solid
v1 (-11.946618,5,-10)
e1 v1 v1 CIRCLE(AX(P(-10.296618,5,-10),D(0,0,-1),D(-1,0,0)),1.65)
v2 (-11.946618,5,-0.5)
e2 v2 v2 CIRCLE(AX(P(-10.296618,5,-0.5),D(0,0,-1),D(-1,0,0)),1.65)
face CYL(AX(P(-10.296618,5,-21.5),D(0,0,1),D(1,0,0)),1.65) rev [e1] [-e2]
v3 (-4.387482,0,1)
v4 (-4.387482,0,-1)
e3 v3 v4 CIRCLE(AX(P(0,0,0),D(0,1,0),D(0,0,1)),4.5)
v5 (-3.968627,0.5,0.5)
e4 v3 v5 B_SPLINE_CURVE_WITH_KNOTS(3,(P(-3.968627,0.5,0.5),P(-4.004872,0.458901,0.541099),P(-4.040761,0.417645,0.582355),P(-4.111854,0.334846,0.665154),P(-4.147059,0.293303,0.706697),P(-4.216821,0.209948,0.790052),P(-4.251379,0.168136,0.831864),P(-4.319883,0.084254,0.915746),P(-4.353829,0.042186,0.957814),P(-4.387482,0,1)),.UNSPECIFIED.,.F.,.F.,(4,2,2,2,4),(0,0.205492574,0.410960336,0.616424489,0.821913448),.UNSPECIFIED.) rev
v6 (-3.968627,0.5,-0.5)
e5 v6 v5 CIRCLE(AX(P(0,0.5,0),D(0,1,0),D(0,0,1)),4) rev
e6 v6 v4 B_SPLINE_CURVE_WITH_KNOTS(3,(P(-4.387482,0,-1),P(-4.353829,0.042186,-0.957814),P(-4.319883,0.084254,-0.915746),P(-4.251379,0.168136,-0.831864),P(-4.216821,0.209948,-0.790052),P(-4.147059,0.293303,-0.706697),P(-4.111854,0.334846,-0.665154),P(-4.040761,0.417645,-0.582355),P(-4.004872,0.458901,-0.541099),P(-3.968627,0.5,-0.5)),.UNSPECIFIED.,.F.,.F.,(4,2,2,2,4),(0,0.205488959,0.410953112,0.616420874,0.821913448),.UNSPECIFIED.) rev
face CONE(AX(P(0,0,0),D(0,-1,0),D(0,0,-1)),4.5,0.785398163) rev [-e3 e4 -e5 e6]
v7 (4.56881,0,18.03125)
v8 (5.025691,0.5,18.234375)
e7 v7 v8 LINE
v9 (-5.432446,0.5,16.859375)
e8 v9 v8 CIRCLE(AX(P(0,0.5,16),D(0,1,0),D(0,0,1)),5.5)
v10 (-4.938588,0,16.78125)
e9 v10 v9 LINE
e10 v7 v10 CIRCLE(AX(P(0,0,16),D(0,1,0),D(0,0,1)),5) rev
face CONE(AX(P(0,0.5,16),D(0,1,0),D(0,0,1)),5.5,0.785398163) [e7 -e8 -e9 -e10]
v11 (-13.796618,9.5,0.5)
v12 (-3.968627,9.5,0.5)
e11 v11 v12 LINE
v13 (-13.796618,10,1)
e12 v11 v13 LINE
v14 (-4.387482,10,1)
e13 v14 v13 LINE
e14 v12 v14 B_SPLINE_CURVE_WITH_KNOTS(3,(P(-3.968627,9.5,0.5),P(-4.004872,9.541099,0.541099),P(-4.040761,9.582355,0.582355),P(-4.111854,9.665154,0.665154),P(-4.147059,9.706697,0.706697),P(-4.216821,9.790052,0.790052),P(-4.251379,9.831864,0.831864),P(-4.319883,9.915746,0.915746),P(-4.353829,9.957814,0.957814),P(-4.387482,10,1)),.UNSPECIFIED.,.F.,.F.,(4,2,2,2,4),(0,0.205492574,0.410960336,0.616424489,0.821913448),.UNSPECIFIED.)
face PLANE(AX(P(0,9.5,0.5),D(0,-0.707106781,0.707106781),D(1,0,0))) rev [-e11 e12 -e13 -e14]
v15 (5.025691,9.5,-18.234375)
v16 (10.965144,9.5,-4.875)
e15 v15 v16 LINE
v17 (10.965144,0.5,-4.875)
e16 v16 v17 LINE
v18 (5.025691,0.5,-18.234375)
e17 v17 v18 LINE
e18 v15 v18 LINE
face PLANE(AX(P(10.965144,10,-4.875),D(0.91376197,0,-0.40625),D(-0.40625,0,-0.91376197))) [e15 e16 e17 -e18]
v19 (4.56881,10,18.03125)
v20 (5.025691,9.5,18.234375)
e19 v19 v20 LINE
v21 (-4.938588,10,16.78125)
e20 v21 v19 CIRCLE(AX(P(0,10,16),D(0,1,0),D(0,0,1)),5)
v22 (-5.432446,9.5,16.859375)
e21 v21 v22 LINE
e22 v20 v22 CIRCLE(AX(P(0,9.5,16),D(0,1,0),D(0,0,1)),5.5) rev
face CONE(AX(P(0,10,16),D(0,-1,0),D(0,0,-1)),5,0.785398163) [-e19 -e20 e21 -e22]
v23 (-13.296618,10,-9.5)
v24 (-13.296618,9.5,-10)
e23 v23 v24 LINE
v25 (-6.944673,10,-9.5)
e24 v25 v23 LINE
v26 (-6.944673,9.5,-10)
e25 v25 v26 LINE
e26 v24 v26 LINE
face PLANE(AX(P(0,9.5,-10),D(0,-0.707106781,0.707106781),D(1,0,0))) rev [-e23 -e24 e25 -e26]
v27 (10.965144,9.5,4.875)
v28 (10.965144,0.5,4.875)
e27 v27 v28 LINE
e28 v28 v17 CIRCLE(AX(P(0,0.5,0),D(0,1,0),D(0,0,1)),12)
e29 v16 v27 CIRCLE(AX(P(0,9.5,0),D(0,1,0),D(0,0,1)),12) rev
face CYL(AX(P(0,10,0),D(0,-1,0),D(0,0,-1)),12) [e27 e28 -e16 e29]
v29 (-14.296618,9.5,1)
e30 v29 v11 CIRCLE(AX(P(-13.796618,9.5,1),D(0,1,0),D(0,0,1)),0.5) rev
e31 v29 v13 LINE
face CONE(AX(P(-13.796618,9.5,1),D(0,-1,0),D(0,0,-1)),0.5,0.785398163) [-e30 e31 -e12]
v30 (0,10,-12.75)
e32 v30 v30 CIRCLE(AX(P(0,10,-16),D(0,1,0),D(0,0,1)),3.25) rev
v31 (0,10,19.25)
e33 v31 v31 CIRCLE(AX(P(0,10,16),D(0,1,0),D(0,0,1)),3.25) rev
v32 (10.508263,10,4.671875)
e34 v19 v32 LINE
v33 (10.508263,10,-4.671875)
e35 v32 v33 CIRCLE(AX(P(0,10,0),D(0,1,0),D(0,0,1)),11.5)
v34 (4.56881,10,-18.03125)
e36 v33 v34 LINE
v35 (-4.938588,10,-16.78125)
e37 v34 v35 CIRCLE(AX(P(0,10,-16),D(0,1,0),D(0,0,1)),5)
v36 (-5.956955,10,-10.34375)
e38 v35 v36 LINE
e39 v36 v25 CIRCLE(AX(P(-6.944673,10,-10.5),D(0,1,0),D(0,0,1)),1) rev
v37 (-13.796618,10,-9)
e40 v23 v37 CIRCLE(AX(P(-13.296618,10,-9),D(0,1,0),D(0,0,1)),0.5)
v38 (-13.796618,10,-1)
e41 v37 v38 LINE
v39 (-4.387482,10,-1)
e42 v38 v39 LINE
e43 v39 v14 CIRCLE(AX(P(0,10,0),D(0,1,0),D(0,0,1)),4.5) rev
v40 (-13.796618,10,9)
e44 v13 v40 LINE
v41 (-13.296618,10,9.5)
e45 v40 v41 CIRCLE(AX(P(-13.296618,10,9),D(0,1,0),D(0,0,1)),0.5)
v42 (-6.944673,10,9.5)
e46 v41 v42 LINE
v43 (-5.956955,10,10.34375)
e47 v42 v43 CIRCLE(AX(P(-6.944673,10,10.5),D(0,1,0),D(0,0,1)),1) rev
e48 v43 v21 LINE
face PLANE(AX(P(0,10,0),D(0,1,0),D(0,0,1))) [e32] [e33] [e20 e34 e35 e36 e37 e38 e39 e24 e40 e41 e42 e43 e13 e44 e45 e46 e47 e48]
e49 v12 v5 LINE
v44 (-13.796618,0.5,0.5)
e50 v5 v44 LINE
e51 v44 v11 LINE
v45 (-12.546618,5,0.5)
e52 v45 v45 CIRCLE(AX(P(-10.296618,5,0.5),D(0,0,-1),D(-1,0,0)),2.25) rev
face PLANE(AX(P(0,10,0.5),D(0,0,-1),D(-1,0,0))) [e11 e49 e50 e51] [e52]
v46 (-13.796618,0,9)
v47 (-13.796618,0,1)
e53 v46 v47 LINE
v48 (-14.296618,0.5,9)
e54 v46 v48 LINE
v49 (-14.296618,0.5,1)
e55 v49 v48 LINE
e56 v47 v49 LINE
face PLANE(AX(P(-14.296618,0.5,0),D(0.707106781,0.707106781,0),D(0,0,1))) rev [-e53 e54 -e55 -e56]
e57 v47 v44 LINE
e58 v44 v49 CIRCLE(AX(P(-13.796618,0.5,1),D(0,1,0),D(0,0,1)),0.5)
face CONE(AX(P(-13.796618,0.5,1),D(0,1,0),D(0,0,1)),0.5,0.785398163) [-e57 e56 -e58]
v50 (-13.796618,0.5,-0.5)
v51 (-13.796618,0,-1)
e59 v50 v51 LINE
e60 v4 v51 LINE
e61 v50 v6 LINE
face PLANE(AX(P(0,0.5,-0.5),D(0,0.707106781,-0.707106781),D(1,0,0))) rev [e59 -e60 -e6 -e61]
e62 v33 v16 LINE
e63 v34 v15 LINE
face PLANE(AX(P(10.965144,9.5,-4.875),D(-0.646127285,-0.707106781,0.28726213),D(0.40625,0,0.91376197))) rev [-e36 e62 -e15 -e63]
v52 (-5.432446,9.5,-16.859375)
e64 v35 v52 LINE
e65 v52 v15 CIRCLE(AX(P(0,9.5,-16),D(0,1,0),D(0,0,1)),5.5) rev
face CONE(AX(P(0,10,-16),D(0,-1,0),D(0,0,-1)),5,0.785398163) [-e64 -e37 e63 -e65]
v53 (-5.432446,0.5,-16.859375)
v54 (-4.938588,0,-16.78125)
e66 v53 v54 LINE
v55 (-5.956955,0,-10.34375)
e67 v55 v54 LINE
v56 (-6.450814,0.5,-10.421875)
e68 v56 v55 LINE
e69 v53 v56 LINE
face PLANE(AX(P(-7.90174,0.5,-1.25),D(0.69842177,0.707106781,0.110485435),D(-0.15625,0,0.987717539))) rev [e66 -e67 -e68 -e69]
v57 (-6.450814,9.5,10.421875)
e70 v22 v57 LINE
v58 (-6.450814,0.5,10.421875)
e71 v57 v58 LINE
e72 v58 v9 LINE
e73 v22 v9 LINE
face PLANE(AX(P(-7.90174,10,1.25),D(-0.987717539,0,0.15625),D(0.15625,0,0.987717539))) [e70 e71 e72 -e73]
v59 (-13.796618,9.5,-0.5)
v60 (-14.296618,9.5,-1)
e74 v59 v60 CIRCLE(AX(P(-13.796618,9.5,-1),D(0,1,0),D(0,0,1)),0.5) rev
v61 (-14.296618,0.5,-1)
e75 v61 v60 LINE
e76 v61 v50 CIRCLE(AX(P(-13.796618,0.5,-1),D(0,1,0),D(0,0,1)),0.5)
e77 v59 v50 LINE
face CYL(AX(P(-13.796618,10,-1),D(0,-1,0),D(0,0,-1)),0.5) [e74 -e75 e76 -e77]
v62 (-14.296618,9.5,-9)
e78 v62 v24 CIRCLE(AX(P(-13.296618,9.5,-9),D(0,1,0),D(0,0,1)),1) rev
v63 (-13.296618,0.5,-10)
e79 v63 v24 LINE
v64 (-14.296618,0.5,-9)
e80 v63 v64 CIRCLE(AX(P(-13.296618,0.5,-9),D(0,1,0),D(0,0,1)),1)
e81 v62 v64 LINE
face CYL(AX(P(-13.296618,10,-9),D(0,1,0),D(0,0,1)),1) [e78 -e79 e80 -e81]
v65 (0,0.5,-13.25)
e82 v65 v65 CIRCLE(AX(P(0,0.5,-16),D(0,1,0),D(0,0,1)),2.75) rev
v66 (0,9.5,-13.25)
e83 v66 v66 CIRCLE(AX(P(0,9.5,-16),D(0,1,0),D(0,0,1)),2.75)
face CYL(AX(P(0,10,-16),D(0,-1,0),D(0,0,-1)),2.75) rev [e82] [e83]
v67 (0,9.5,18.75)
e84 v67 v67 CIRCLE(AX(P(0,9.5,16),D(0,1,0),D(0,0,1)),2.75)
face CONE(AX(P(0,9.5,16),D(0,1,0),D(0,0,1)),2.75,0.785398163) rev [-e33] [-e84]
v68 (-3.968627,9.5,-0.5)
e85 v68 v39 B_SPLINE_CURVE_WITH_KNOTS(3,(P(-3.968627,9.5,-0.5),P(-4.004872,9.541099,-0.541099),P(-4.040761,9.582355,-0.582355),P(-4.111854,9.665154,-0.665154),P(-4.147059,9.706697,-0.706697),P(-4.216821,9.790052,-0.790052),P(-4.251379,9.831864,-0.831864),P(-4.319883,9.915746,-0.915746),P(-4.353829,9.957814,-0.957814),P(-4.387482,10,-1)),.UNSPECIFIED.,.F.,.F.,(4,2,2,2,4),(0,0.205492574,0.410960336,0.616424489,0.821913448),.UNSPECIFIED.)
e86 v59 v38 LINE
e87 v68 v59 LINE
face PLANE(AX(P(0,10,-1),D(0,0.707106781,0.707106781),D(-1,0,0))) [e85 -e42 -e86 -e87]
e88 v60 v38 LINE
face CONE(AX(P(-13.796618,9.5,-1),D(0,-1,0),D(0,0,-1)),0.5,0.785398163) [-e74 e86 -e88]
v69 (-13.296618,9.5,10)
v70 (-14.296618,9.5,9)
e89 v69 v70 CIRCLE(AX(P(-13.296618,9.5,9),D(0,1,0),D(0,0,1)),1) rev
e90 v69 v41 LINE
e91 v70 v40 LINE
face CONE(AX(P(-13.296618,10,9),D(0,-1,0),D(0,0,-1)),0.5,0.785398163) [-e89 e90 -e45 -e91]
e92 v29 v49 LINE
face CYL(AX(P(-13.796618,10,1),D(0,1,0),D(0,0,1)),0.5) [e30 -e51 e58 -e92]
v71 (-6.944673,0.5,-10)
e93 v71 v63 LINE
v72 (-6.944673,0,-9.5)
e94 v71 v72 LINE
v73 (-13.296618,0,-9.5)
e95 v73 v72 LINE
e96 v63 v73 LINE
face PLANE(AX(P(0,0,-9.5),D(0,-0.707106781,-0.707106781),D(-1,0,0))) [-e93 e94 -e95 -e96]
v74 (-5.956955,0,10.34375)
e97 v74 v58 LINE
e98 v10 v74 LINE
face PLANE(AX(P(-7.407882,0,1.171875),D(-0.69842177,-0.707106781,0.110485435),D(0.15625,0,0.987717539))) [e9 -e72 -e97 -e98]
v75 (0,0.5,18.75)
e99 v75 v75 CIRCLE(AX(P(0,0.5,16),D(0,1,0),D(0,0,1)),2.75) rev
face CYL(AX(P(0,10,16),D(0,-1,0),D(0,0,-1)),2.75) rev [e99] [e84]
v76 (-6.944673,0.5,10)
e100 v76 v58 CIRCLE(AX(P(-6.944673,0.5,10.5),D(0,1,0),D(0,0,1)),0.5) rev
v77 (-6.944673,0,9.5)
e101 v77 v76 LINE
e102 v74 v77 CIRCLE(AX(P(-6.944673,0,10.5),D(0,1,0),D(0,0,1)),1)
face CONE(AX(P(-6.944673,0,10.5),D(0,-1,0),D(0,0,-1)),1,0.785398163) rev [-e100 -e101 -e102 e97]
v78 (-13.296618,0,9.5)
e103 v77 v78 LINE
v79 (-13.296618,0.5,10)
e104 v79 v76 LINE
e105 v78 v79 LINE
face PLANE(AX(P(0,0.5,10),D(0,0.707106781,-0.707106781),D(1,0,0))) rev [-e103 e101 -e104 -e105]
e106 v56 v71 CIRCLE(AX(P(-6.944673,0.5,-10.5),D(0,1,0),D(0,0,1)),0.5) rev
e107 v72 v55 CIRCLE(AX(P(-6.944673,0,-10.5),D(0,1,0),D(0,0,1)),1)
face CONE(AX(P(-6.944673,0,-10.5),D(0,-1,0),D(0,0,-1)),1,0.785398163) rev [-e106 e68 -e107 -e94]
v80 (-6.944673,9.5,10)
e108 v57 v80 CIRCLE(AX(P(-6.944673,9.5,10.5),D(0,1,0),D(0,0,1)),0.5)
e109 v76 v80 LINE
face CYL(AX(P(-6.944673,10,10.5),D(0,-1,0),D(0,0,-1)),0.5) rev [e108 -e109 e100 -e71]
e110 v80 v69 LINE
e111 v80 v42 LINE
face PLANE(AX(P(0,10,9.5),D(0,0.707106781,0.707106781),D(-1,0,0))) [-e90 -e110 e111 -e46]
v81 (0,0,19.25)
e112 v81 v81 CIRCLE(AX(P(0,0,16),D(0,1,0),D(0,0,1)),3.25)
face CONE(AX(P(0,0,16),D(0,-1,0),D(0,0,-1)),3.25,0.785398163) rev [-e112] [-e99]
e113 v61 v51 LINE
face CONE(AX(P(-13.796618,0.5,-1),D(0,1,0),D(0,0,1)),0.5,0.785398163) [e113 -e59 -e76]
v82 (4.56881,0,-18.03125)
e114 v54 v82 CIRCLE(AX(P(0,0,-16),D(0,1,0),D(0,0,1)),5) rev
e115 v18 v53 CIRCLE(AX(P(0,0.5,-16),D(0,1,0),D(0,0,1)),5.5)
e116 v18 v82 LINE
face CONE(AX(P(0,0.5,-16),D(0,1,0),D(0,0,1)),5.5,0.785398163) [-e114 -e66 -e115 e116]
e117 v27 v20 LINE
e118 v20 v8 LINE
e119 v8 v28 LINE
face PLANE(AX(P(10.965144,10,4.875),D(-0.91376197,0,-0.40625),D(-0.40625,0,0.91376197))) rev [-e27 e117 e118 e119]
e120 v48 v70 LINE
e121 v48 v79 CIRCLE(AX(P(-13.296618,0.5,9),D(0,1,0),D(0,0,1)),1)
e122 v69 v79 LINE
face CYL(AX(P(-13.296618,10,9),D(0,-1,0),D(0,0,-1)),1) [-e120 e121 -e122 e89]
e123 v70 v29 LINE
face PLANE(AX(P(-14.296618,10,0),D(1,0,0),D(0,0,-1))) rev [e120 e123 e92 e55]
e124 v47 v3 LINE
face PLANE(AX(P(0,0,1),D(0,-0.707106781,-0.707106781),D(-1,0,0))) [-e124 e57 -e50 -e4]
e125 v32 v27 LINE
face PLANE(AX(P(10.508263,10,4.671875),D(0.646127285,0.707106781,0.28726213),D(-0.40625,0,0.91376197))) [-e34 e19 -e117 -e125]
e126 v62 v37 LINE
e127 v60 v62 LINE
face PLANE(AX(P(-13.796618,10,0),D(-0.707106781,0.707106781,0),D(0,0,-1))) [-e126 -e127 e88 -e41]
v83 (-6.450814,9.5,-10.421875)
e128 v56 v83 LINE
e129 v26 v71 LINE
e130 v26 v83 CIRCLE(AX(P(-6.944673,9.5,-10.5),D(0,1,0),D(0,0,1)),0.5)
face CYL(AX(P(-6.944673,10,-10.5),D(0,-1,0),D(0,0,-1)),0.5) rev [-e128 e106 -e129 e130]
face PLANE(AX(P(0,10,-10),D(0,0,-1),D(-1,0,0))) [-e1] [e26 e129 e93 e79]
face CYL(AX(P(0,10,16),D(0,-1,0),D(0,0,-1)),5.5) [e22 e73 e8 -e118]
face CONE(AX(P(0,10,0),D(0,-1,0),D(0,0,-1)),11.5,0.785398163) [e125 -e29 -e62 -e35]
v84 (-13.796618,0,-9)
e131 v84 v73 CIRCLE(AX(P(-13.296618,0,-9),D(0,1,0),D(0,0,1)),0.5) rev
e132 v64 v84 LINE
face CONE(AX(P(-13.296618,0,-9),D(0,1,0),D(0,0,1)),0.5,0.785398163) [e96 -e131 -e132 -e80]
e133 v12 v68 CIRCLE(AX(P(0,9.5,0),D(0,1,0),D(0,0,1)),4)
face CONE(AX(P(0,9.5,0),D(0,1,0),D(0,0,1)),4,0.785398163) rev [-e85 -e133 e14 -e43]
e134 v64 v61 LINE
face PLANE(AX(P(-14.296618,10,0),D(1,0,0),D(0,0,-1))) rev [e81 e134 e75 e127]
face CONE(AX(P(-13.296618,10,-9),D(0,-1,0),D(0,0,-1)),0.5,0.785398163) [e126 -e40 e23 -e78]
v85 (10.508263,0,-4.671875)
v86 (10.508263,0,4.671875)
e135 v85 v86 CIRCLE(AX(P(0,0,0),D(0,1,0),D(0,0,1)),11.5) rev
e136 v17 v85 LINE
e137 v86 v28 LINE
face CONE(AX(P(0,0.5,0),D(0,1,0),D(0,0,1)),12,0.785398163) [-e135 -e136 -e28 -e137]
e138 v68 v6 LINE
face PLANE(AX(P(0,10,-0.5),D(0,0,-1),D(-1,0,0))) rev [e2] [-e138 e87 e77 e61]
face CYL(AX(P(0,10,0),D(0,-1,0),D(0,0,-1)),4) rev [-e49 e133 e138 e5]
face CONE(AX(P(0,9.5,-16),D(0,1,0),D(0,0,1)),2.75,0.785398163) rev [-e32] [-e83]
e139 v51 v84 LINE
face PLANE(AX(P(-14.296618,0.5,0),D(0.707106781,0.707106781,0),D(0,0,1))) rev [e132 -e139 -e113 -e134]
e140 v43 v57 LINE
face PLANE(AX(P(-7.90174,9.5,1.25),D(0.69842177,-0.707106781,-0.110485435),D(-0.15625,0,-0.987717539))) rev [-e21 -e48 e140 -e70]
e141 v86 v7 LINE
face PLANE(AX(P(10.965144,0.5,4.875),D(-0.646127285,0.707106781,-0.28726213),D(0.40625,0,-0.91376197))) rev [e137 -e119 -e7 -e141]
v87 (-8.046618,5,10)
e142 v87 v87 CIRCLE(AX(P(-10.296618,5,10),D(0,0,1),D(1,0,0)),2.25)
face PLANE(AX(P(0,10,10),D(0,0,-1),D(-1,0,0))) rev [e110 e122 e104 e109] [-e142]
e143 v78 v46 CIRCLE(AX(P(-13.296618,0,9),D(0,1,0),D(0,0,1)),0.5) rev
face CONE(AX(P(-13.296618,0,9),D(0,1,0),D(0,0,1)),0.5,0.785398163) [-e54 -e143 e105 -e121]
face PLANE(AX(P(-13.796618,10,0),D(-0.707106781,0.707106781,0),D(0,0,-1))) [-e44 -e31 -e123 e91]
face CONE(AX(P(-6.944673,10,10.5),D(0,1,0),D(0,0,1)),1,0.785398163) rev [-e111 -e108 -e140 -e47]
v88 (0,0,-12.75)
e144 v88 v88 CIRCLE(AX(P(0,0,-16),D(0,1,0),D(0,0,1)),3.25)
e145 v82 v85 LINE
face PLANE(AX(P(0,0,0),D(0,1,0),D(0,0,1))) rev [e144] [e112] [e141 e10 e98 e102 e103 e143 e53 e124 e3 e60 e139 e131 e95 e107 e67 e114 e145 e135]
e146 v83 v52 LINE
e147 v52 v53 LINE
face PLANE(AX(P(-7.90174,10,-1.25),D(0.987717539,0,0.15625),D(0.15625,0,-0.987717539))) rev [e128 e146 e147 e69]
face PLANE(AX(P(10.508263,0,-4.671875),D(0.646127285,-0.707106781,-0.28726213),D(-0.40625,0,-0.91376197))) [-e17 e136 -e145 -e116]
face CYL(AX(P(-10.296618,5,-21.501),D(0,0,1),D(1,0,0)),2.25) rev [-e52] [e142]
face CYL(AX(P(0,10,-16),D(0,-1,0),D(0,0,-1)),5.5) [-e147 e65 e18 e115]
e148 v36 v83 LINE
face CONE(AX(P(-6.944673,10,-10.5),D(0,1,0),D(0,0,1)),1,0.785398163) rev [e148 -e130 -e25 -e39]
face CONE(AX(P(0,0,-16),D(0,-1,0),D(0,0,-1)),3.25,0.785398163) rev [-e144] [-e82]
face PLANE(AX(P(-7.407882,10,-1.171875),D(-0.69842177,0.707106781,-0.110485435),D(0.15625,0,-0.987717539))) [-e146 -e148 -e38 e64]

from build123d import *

# Parameters (mm, degrees)
SKETCH_1_R          = 2.75
EXTRUDE_1_DEPTH     = 10
CUT_EXTRUDE_1_REACH = 38.009
SKETCH_3_R          = 2.25
SKETCH_3_3_R        = 1.65
CUT_EXTRUDE_2_DEPTH = 37.00893353
FILLET_1_R          = 1
FILLET_2_R          = 0.5
CHAMFER_1_SIZE      = 0.5


with BuildPart() as part:
    # 草图1 → 凸台-拉伸1 (new body)
    with BuildSketch(Plane(origin=(0, 0, 0), x_dir=(1, 0, 0), z_dir=(0, 1, 0))):
        with BuildLine():
            ThreePointArc((5.025690834, 18.234375), (-0.716951035, 21.453070806), (-5.432446466, 16.859375))
            Line((-5.432446466, 16.859375), (-6.517551571, 10))
            Line((-6.517551571, 10), (-14.296618271, 10))
            Line((-14.296618271, 10), (-14.296618271, 0.5))
            Line((-14.296618271, 0.5), (-3.968626967, 0.5))
            ThreePointArc((-3.968626967, 0.5), (4, 0), (-3.968626967, -0.5))
            Line((-3.968626967, -0.5), (-14.296618271, -0.5))
            Line((-14.296618271, -0.5), (-14.296618271, -10))
            Line((-14.296618271, -10), (-6.517551571, -10))
            Line((-6.517551571, -10), (-5.432446466, -16.859375))
            ThreePointArc((-5.432446466, -16.859375), (-0.716951035, -21.453070806), (5.025690834, -18.234375))
            Line((5.025690834, -18.234375), (10.965143638, -4.875))
            ThreePointArc((10.965143638, -4.875), (12, 0), (10.965143638, 4.875))
            Line((10.965143638, 4.875), (5.025690834, 18.234375))
        make_face()
        with Locations(Location((0, -16, 0), (0, 0, 270))):
            Circle(SKETCH_1_R, mode=Mode.SUBTRACT)
        with Locations(Location((0, 16, 0), (0, 0, 270))):
            Circle(SKETCH_1_R, mode=Mode.SUBTRACT)
    extrude(amount=EXTRUDE_1_DEPTH)

    # 草图3 → 切除-拉伸1 (cut, up to next)
    with BuildSketch(Plane.XY.offset(10), mode=Mode.PRIVATE) as cut_extrude_1_sk1:
        with Locations((-10.296618271, 5)):
            Circle(SKETCH_3_R)
    cut_extrude_1_tool1 = extrude(cut_extrude_1_sk1.sketch, amount=-CUT_EXTRUDE_1_REACH, mode=Mode.PRIVATE) & part.part
    add(cut_extrude_1_tool1.solids().sort_by_distance((-10.296618, 5, 10))[0], mode=Mode.SUBTRACT)

    # 草图3<3> → 切除-拉伸2 (cut, through all)
    with BuildSketch(Plane.XY.offset(10)):
        with Locations(Location((-10.296618271, 5, 0), (0, 0, 180))):
            Circle(SKETCH_3_3_R)
    extrude(amount=-CUT_EXTRUDE_2_DEPTH, mode=Mode.SUBTRACT)

    # 圆角1
    fillet_1_edges = [part.edges().sort_by_distance(p)[0] for p in [
        (-14.296618271, 5, 10),
        (-14.296618271, 5, -10),
    ]]
    fillet(fillet_1_edges, radius=FILLET_1_R)

    # 圆角2
    fillet_2_edges = [part.edges().sort_by_distance(p)[0] for p in [
        (-6.517551571, 5, 10),
        (-14.296618271, 5, 0.5),
        (-14.296618271, 5, -0.5),
        (-6.517551571, 5, -10),
    ]]
    fillet(fillet_2_edges, radius=FILLET_2_R)

    # 倒角1
    chamfer_1_edges = [part.edges().sort_by_distance(p)[0] for p in [
        (-6.619913143, 0, 10.119827342),
        (-6.619913143, 10, 10.119827342),
        (-6.619913143, 0, -10.119827342),
        (-6.619913143, 10, -10.119827342),
        (-0.716951035, 10, 21.453070806),
        (7.995417236, 10, 11.5546875),
        (0, 0, 13.25),
        (0, 0, -18.75),
        (4, 0, 0),
        (12, 10, 0),
        (-5.941630183, 0, -13.640625),
        (-0.716951035, 0, -21.453070806),
        (7.995417236, 0, -11.5546875),
        (12, 0, 0),
        (7.995417236, 0, 11.5546875),
        (-0.716951035, 0, 21.453070806),
        (-5.941630183, 0, 13.640625),
        (7.995417236, 10, -11.5546875),
        (-0.716951035, 10, -21.453070806),
        (-5.941630183, 10, -13.640625),
        (4, 10, 0),
        (-14.296618271, 0, -5),
        (-14.296618271, 10, -5),
        (-10.12064547, 0, 10),
        (-10.12064547, 0, -10),
        (-14.003725052, 0, 9.707106781),
        (-14.003725052, 0, -9.707106781),
        (-10.12064547, 10, -10),
        (-5.941630183, 10, 13.640625),
        (-10.12064547, 10, 10),
        (-14.003725052, 10, 9.707106781),
        (-14.003725052, 10, -9.707106781),
        (0, 10, -18.75),
        (-8.882622619, 0, -0.5),
        (-8.882622619, 10, -0.5),
        (0, 10, 13.25),
        (-14.296618271, 0, 5),
        (-8.882622619, 0, 0.5),
        (-14.150171662, 0, 0.646446609),
        (-14.150171662, 0, -0.646446609),
        (-8.882622619, 10, 0.5),
        (-14.296618271, 10, 5),
        (-14.150171662, 10, 0.646446609),
        (-14.150171662, 10, -0.646446609),
    ]]
    chamfer(chamfer_1_edges, length=CHAMFER_1_SIZE - 0.0001)  # a hair under: the kernel refuses the full size


solid = part.part
